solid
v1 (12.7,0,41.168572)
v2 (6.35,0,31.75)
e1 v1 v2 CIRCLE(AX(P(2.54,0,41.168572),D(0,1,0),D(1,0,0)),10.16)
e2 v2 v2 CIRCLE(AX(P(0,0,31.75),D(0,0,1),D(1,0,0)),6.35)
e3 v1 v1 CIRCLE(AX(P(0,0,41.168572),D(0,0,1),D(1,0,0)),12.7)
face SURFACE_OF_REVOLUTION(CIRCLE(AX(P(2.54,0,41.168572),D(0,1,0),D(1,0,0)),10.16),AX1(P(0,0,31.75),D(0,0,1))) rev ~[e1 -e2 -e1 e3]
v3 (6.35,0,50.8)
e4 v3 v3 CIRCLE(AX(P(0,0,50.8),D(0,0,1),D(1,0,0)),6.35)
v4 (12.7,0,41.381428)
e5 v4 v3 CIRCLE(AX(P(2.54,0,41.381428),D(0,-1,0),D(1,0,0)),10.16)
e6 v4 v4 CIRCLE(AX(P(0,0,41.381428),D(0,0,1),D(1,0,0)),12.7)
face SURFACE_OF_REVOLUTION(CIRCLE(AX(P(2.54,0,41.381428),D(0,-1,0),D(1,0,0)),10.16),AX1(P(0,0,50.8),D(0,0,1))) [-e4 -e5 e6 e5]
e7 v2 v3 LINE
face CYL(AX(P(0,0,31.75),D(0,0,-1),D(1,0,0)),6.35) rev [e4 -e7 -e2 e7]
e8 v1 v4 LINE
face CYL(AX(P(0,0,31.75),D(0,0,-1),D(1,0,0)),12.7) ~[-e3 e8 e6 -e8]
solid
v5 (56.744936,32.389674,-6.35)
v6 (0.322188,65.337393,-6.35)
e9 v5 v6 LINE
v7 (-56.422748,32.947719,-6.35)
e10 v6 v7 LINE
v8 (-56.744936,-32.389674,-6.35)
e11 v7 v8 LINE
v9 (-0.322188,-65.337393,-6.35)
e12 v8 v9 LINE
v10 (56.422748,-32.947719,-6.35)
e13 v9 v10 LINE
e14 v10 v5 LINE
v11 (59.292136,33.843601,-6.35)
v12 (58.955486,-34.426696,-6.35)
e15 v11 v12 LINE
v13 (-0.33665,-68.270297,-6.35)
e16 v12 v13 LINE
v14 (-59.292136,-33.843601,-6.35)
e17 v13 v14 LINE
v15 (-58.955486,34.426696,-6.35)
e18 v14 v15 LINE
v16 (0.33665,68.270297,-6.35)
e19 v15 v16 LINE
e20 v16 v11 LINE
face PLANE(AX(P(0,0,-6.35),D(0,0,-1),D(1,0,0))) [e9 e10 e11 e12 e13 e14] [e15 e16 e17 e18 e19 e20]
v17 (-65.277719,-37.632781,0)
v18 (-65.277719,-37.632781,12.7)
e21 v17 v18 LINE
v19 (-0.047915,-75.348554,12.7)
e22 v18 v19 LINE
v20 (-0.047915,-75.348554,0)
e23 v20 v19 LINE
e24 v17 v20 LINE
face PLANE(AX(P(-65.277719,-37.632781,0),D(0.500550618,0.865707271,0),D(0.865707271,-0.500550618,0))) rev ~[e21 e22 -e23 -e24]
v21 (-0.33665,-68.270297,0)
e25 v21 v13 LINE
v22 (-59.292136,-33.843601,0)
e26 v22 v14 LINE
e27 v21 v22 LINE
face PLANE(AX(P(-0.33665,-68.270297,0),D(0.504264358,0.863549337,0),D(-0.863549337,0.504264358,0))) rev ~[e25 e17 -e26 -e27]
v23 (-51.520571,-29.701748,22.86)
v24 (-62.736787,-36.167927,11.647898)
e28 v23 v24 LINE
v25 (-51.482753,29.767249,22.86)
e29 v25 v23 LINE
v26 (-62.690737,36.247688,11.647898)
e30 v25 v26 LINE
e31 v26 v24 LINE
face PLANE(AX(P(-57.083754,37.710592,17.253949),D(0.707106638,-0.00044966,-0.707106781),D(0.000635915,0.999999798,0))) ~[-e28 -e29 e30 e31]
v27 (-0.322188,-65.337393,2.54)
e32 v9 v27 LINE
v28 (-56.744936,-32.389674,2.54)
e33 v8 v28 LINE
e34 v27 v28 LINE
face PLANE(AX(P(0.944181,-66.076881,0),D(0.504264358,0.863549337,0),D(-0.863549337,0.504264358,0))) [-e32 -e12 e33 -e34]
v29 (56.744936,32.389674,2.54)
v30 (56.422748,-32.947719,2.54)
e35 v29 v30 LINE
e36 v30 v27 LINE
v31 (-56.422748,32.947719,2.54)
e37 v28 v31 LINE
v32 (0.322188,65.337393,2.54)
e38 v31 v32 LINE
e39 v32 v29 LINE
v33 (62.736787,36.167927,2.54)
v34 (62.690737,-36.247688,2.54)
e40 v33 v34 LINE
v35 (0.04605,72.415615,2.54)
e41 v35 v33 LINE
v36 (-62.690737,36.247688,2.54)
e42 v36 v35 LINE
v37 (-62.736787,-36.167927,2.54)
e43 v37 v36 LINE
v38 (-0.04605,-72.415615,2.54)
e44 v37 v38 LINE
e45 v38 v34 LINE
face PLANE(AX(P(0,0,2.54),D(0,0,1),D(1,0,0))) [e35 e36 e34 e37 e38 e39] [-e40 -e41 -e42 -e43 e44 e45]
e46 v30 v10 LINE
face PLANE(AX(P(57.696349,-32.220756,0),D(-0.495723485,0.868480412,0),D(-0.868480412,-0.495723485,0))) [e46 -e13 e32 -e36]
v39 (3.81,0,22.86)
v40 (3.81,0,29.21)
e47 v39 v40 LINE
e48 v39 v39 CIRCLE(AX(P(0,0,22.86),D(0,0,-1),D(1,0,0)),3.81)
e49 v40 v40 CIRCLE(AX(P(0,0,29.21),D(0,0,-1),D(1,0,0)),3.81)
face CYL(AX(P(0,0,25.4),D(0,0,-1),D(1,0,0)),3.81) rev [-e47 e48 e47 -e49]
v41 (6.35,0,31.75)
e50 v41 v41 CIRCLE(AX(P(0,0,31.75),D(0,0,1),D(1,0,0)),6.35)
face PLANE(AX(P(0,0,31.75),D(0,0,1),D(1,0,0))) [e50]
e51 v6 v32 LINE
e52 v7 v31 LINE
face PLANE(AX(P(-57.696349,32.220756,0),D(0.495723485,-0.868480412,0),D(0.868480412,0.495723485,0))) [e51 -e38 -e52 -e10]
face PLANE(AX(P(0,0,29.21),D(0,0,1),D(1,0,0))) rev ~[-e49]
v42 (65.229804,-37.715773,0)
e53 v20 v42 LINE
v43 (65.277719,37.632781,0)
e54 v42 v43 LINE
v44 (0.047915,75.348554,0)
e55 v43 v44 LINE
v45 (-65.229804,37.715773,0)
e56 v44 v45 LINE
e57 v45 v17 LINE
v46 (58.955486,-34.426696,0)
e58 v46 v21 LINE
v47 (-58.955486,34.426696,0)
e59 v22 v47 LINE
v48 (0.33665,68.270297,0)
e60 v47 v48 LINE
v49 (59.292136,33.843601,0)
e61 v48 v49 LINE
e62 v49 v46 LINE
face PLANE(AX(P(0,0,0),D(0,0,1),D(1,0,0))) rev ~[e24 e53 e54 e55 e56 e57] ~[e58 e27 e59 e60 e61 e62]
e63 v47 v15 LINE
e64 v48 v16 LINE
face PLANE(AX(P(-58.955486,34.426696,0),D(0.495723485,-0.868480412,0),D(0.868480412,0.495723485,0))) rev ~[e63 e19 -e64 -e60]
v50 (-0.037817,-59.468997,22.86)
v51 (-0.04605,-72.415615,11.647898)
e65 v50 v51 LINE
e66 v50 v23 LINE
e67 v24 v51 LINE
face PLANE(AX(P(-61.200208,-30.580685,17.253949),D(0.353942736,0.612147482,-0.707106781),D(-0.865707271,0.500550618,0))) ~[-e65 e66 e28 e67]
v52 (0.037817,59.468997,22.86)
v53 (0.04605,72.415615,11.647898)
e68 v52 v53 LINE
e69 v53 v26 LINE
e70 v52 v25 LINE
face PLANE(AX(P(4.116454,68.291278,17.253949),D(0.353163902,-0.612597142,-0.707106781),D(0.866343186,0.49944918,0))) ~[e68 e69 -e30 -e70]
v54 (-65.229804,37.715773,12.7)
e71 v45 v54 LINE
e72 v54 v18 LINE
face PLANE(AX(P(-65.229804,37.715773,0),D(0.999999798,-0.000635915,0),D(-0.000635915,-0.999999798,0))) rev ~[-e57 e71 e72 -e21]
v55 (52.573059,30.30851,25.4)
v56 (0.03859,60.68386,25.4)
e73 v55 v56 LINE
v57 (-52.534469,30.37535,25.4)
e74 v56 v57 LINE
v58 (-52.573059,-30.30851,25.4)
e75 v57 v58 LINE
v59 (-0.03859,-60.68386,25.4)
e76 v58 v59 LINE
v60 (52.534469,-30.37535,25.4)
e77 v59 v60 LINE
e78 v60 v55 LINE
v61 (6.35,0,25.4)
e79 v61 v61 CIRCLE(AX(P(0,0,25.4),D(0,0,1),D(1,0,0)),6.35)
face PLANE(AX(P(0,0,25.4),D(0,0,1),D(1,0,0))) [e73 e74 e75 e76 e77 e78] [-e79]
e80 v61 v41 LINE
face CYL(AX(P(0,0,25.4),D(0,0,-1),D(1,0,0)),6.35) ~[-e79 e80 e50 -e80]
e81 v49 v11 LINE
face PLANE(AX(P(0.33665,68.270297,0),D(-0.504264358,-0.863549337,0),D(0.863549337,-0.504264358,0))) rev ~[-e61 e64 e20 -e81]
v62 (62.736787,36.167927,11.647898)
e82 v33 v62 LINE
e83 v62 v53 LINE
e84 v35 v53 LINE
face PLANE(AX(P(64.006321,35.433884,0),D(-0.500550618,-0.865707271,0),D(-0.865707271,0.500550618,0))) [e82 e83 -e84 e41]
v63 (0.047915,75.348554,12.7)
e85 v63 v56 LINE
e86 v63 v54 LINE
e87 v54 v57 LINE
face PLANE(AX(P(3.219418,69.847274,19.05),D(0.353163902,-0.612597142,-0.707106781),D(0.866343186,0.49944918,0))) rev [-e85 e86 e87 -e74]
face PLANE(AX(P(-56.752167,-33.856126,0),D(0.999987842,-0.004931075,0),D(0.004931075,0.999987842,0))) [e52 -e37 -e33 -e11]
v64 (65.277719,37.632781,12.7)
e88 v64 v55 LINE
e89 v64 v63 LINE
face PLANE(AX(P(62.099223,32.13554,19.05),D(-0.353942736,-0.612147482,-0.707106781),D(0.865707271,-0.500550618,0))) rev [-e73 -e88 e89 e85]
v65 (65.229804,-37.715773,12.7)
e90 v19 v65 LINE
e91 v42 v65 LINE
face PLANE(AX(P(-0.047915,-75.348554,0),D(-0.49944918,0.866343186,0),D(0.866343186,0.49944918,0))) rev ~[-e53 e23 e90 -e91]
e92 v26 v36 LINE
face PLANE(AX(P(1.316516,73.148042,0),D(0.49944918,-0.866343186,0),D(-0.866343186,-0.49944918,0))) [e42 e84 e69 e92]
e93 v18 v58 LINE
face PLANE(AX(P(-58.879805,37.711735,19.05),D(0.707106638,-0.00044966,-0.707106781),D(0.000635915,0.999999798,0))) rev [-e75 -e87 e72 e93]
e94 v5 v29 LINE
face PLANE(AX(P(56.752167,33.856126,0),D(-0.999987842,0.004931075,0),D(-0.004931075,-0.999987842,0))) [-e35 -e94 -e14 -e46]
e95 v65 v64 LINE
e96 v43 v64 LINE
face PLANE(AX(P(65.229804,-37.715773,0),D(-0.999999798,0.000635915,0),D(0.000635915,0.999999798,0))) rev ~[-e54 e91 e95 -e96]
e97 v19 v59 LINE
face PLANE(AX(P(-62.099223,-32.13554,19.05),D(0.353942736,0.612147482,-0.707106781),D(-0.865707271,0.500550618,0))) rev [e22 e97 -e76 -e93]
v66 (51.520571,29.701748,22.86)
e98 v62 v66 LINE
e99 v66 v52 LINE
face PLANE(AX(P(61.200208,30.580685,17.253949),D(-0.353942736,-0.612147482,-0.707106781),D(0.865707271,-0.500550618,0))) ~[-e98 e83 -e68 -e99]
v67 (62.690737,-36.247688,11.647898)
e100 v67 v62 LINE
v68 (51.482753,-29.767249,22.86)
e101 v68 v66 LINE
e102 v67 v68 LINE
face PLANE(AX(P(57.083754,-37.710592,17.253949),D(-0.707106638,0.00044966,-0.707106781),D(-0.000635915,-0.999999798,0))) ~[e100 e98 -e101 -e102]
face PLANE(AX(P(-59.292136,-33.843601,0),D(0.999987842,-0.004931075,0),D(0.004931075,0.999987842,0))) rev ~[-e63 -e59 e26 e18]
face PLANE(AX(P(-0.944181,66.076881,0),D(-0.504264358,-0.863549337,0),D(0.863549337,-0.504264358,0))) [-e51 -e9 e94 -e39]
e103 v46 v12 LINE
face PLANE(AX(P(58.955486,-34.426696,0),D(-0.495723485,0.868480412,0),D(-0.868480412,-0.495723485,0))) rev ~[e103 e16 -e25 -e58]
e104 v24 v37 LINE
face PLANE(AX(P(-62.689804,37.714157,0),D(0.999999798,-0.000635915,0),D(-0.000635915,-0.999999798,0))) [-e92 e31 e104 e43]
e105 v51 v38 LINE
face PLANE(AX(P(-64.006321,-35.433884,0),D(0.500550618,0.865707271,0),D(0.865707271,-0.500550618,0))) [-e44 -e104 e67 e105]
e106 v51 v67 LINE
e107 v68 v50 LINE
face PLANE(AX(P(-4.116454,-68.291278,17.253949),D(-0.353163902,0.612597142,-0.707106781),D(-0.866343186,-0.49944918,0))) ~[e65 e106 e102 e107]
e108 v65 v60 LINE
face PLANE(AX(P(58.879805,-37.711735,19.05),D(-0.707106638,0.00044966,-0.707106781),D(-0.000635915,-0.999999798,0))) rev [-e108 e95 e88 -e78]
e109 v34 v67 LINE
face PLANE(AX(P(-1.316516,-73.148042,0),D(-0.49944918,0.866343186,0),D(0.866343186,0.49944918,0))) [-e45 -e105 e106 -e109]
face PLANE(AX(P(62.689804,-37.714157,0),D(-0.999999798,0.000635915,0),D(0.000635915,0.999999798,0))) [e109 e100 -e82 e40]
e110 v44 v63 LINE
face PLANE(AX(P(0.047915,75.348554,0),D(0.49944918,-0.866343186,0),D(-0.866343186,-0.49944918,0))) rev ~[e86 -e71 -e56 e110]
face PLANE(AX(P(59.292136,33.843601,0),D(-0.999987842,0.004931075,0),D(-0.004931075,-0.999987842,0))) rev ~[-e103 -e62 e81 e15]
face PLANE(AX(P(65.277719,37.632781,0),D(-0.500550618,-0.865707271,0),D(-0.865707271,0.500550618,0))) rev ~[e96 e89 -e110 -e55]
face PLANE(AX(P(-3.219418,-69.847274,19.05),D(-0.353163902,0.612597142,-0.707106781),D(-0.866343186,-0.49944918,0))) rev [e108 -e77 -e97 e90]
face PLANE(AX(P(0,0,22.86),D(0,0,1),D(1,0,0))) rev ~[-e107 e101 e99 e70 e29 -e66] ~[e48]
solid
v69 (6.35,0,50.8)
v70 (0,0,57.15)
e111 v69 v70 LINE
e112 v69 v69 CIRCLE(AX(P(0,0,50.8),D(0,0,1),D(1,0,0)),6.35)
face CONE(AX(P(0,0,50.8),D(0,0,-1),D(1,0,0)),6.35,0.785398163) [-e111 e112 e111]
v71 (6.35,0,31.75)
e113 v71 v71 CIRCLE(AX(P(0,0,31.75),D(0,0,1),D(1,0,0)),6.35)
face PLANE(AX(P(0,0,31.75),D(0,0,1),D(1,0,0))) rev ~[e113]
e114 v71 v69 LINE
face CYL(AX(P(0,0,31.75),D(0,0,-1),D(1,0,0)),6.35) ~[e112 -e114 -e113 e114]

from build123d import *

# Parameters (mm, degrees)
F1_DEPTH  = 25.4
F2_SIZE   = 12.7
F3_R      = 6.35
F4_DEPTH  = 6.35
F5_R      = 12.7
F5_R_2    = 6.35
F6_DEPTH  = 19.05
F8_DEPTH  = 25.4
F9_SIZE   = 6.35
F11_DEPTH = 6.35
F12_T     = -2.54


# Not quite as in the source:
# - a fillet or chamfer that OpenCascade refuses, or shapes differently, is made with other operations: its cross-section is extruded or revolved along the edge and cut away or added


with BuildPart() as f1:
    # F0 (on Top) → F1 (new body)
    with BuildSketch(Plane.XY):
        Polygon((-0.0479153058, -75.3485536492), (65.2298039457, -37.7157726967), (65.2777192516, 37.6327809526), (0.0479153058, 75.3485536492), (-65.2298039457, 37.7157726967), (-65.2777192516, -37.6327809526), align=None)
    extrude(amount=F1_DEPTH)

    # F2
    f2_edges = [f1.edges().sort_by_distance(p)[0] for p in [
        (-32.662817, -56.490667, 25.4),
        (32.590944, -56.532163, 25.4),
        (65.253762, -0.041496, 25.4),
        (32.662817, 56.490667, 25.4),
        (-32.590944, 56.532163, 25.4),
        (-65.253762, 0.041496, 25.4),
    ]]
    chamfer(f2_edges, length=F2_SIZE)

    # F3 (on face) → F4 (join)
    with BuildSketch(Plane.XY.offset(25.4)):
        Circle(F3_R)
    extrude(amount=F4_DEPTH)


with BuildPart() as f6:
    # F5 (on face) → F6 (new body)
    with BuildSketch(Plane.XY.offset(31.75)):
        Circle(F5_R)
        Circle(F5_R_2, mode=Mode.SUBTRACT)
    extrude(amount=F6_DEPTH)

    # F7: fillet of radius 10.16 on 2 edges, made by hand

    # F7_s1 → F7_t2 (revolve, cut)
    with BuildSketch(Plane.XZ):
        with BuildLine():
            ThreePointArc((12.7, 41.3814279214), (10.9642269675, 47.0610405842), (6.35, 50.8))
            Line((6.35, 50.8), (12.7, 50.8))
            Line((12.7, 50.8), (12.7, 41.3814279214))
        make_face()
    revolve(axis=Axis((0, 0, 50.8), (0, 0, 1)), mode=Mode.SUBTRACT)

    # F7_s3 → F7_t4 (revolve, cut)
    with BuildSketch(Plane.XZ):
        with BuildLine():
            ThreePointArc((12.7, 41.1685720786), (10.9642269675, 35.4889594158), (6.35, 31.75))
            Line((6.35, 31.75), (12.7, 31.75))
            Line((12.7, 31.75), (12.7, 41.1685720786))
        make_face()
    revolve(axis=Axis((0, 0, 31.75), (0, 0, 1)), mode=Mode.SUBTRACT)


with BuildPart() as f8:
    # F8 (new): a face of the model
    f8_faces = [f1.part.faces().sort_by_distance(p)[0] for p in [
        (0, 0, 31.75),
    ]]
    extrude(f8_faces, amount=F8_DEPTH)

    # F9
    f9_edges = [f8.edges().sort_by_distance(p)[0] for p in [
        (-6.35, 0, 57.15),
    ]]
    chamfer(f9_edges, length=F9_SIZE)


with BuildPart() as f1_1:
    add(f1.part)

    # F10 (on face) → F11 (join)
    with BuildSketch(Plane(origin=(0, 0, 0), x_dir=(1, 0, 0), z_dir=(0, 0, -1))):
        Polygon((58.9554861724, 34.4266958261), (-0.3366500675, 68.2702966308), (-59.29213624, 33.8436008047), (-58.9554861724, -34.4266958261), (0.3366500675, -68.2702966308), (59.29213624, -33.8436008047), align=None)
    extrude(amount=F11_DEPTH)

    # F12
    f12_openings = [f1_1.faces().sort_by_distance(p)[0] for p in [
        (0, 0, -6.35),
    ]]
    offset(amount=F12_T, openings=f12_openings, kind=Kind.INTERSECTION)


solid = Compound([f6.part, f8.part, f1_1.part])
